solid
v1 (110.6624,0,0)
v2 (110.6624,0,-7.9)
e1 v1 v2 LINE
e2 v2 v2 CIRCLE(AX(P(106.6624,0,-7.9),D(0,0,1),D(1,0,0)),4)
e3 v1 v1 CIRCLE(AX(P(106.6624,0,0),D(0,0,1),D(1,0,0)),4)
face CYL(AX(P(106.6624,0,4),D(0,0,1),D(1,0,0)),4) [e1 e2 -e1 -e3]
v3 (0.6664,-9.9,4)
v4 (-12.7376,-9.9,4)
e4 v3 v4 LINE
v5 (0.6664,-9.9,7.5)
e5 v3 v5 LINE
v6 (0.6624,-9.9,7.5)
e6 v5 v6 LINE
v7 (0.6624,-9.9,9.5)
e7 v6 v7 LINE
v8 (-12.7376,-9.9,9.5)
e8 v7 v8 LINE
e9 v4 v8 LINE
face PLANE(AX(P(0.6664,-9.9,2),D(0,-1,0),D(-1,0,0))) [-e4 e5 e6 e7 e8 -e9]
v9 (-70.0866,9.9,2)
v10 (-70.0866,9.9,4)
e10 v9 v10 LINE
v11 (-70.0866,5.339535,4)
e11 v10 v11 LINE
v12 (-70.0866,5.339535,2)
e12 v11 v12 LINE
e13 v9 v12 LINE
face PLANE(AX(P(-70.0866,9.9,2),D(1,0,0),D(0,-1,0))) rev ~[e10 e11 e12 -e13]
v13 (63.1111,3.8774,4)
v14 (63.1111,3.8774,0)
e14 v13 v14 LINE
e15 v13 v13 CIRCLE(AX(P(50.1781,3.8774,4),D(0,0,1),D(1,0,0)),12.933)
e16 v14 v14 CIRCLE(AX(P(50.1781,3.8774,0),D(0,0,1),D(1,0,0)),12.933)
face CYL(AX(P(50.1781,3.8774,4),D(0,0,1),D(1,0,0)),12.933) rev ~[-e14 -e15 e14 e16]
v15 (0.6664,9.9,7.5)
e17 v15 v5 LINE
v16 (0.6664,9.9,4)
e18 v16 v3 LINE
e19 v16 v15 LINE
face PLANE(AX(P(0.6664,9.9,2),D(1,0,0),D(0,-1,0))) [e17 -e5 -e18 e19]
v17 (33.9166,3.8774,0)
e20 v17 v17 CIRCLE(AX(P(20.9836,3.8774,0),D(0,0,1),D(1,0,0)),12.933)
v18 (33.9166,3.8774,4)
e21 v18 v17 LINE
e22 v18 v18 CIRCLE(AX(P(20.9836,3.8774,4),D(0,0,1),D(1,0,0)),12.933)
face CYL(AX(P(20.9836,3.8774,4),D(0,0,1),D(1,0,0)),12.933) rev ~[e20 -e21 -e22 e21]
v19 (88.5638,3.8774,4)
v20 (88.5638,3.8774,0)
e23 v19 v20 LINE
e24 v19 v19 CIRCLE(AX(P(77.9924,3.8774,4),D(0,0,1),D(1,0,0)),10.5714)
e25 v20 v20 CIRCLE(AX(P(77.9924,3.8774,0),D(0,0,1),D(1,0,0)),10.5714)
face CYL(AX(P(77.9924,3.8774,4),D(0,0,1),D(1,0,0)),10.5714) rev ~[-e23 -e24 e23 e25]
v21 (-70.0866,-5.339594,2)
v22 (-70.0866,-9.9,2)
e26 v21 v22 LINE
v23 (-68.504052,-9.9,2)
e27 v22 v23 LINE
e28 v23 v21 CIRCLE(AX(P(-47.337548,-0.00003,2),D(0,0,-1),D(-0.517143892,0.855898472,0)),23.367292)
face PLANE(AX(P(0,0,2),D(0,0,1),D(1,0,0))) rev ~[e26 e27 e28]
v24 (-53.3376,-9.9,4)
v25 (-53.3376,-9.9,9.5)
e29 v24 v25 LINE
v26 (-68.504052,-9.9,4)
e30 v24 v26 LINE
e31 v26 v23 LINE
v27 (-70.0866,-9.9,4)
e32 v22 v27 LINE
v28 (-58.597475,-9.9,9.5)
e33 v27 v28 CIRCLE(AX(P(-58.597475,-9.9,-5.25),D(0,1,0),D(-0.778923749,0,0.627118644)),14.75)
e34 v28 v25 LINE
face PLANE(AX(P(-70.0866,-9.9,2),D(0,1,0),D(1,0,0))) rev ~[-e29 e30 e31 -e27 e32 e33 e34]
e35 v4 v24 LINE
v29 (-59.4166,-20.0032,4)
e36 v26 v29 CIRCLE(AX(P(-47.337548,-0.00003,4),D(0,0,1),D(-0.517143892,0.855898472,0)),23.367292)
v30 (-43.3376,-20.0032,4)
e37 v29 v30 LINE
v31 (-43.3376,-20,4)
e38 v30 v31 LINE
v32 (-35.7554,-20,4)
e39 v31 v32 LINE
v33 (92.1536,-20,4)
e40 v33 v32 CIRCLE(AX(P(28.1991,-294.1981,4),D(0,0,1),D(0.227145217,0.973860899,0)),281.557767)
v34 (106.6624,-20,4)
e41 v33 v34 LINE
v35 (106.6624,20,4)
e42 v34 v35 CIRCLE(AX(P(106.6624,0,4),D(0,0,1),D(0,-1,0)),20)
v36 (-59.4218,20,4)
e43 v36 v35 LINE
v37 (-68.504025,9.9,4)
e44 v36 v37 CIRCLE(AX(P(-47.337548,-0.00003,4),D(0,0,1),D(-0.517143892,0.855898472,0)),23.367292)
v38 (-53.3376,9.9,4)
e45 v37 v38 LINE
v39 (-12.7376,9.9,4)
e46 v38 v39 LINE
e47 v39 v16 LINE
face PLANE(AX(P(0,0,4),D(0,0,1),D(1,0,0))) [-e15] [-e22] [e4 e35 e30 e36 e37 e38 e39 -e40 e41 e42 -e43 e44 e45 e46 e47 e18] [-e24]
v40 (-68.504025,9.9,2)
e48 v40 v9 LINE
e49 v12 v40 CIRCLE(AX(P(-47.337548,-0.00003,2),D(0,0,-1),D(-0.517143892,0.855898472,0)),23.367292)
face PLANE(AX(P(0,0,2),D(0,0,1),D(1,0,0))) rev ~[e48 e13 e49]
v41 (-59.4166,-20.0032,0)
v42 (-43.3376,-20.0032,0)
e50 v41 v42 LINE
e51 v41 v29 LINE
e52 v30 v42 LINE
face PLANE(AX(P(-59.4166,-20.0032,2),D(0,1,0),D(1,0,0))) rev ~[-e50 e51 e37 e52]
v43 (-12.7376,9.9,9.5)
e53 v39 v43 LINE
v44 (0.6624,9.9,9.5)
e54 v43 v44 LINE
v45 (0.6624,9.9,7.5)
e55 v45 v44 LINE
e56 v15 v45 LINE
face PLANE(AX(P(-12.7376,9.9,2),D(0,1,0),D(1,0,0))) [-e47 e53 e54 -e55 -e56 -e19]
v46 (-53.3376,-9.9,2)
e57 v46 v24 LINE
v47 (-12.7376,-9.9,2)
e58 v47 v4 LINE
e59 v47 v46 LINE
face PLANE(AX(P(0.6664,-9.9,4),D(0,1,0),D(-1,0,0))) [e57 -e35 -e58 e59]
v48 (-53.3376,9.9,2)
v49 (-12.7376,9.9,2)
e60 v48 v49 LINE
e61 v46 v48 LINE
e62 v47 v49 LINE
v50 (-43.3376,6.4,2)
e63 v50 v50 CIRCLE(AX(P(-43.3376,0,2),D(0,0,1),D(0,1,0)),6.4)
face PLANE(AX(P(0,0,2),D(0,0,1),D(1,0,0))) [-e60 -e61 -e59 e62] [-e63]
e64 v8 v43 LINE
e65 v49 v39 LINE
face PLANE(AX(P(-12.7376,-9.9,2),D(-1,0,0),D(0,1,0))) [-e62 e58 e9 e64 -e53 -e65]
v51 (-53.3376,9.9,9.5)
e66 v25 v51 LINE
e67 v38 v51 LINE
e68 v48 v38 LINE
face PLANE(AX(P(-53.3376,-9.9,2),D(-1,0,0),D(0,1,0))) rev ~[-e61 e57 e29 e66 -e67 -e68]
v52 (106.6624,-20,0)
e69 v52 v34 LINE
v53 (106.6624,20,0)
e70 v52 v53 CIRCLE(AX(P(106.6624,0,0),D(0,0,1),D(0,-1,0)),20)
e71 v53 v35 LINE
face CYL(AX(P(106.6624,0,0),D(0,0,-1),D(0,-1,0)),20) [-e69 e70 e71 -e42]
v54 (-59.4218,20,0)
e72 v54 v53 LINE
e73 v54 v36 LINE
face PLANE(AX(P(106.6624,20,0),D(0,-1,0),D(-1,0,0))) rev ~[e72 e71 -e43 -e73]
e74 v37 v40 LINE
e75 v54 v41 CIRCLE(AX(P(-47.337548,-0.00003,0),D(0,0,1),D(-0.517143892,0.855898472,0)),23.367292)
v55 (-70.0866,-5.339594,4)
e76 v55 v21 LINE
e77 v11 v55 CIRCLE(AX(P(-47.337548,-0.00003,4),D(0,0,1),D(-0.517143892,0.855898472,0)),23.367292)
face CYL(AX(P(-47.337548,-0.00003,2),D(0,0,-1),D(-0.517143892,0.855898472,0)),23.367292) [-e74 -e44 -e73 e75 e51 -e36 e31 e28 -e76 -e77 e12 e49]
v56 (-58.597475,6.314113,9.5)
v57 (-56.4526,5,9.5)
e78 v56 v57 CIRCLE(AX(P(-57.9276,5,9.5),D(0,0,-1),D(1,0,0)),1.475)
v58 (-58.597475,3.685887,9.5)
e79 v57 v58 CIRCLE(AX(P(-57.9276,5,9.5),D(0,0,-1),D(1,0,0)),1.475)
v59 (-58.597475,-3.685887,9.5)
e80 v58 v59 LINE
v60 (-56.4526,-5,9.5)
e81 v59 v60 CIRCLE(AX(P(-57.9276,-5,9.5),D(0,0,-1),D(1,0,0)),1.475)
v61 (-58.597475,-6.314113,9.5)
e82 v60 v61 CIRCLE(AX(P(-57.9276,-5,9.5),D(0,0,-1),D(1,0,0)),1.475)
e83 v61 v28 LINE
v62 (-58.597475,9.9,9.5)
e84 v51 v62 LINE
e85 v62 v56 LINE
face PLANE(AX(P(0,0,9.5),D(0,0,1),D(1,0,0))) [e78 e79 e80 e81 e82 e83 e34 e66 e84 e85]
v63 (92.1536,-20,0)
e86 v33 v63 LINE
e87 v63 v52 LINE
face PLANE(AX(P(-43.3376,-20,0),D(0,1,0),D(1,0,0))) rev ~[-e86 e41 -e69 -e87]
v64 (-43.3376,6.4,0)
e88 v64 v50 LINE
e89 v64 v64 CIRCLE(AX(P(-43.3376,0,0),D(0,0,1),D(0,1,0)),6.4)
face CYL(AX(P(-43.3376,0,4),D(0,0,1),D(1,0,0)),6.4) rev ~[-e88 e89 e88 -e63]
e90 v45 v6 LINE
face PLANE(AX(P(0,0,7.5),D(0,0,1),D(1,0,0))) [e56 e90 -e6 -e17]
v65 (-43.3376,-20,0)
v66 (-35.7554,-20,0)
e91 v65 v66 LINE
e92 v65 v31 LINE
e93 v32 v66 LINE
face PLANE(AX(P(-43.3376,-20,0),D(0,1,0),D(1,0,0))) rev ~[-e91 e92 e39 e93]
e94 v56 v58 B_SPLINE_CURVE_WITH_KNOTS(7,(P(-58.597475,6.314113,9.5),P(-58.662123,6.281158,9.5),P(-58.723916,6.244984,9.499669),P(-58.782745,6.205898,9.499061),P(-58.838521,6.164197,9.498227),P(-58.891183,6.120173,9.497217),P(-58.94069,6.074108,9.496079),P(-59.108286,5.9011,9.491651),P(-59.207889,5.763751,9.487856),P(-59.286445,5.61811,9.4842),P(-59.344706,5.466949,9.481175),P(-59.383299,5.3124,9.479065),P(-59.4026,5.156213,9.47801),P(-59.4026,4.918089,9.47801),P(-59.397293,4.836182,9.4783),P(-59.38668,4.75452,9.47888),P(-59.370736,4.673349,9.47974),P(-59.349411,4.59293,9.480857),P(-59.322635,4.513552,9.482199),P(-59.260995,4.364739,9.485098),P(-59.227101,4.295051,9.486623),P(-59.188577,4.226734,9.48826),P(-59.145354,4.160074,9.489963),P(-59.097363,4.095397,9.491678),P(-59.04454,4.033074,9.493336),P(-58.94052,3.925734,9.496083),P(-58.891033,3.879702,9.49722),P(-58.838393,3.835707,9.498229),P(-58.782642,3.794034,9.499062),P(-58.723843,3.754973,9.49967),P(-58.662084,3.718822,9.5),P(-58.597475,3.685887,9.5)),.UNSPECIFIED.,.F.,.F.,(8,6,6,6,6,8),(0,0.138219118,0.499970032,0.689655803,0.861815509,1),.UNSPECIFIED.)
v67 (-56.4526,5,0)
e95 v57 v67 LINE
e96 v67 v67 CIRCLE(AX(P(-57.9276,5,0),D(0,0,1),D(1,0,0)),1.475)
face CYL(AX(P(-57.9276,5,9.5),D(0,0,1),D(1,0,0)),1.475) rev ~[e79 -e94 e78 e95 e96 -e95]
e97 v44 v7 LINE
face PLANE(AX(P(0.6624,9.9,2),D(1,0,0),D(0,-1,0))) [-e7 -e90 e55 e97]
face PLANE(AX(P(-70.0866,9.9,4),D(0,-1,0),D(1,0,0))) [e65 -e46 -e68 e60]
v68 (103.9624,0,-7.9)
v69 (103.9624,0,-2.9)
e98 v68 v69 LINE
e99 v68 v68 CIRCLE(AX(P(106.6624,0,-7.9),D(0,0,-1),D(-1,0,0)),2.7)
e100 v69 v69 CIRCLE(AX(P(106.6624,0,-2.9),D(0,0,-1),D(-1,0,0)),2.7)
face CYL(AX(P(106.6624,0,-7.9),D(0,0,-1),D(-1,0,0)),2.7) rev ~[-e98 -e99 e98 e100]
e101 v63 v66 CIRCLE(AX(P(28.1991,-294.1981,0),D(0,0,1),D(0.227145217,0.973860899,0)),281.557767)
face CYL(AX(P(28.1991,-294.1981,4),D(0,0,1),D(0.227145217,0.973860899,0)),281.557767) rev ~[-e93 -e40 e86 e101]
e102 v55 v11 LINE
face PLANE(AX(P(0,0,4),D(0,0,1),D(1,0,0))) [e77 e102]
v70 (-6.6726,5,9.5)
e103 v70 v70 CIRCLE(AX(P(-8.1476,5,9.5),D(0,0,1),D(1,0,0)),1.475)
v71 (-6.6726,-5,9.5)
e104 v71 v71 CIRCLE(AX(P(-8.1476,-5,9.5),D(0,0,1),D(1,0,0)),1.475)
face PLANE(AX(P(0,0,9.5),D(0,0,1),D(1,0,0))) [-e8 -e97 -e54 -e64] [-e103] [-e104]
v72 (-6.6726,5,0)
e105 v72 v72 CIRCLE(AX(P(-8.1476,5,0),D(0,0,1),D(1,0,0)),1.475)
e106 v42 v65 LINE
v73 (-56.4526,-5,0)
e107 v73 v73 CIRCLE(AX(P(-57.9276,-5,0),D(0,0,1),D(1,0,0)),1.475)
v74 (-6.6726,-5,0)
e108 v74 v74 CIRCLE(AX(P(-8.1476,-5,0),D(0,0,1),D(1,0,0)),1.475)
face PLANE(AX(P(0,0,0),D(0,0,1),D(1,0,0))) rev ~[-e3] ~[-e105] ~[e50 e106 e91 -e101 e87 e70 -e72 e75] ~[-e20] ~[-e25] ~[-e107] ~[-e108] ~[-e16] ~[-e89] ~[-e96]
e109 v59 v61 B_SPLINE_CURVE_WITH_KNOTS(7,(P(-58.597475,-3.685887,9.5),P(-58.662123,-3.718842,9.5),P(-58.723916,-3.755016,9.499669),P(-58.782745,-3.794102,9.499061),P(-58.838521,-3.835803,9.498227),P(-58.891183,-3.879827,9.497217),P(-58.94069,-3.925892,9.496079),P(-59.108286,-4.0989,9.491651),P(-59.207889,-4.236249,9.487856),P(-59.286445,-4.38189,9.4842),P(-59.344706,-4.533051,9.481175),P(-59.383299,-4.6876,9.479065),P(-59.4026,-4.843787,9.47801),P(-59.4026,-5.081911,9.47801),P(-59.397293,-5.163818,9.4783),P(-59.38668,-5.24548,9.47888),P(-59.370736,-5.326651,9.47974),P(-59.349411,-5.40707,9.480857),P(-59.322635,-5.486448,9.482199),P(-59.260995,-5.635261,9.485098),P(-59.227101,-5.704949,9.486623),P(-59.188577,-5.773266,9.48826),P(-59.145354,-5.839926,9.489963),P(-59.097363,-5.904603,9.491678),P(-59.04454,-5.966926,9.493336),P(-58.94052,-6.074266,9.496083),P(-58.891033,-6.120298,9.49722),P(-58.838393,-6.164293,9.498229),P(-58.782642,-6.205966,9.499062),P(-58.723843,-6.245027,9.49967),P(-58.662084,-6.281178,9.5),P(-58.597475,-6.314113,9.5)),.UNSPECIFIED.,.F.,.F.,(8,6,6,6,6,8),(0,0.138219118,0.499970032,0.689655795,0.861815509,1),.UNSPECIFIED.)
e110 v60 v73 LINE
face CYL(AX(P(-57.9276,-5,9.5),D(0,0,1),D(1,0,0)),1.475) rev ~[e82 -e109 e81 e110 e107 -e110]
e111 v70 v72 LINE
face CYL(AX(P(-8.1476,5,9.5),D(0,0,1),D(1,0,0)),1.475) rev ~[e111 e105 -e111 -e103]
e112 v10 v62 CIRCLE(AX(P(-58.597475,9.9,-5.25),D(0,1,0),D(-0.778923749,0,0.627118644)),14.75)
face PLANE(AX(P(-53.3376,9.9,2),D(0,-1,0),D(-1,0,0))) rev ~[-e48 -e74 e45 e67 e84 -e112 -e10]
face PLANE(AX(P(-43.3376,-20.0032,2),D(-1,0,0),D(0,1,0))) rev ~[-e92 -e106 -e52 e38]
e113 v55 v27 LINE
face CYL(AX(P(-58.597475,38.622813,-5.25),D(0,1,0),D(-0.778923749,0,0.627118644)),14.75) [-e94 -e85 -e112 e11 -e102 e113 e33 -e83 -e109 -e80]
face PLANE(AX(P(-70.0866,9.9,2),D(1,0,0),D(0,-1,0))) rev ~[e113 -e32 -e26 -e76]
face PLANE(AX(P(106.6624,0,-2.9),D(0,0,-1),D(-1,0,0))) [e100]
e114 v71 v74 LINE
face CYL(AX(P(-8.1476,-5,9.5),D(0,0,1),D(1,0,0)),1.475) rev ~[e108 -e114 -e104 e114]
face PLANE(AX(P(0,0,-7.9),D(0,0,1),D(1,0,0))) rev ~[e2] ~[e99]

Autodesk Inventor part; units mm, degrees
ref_plane "YZ Plane" through (0, 0, 0) normal (1, 0, 0) x (0, 1, 0)
ref_plane "XZ Plane" through (0, 0, 0) normal (0, 1, 0) x (-1, 0, 0)
ref_plane "XY Plane" through (0, 0, 0) normal (0, 0, 1) x (1, 0, 0)
sketch "Sketch1" plane through (0, 0, 0) normal (0, 0, 1) x (1, 0, 0)
  line L0 (-43.3376, 0) -> (106.6624, 0) construction
  line L1 (-43.3376, -20) -> (106.6624, -20)
  line L2 (106.6624, 20) -> (-43.3376, 20)
  arc A0 (-43.3376, 20) -> (-43.3376, -20) centre (-43.3376, 0) ccw
  arc A1 (106.6624, -20) -> (106.6624, 20) centre (106.6624, 0) ccw
  point P0 (0, 0)
  point P1 (31.6624, 0)
  dimension "d0" = 150
  dimension "d1" = 20
extrude "Extrusion1" add sketch "Sketch1" along normal blind 4
sketch "Sketch2" plane through (0, 0, 4) normal (0, 0, 1) x (1, 0, 0)
  arc A0 (-43.3376, 20) -> (-43.3376, -20) centre (-43.3376, 0) ccw projected
  arc A1 (106.6624, -20) -> (106.6624, 20) centre (106.6624, 0) ccw projected
  circle A2 centre (-43.3376, 0) radius 6.4
  circle A3 centre (106.6624, 0) radius 4
  point P0 (0, 0)
  dimension "d4" = 12.8
  dimension "d5" = 8
extrude "Extrusion2" add sketch "Sketch2" against normal blind 11.9 contours A3
sketch "Sketch5" plane through (0, 0, 4) normal (0, 0, 1) x (1, 0, 0)
  line L0 (-43.3376, -20) -> (106.6624, -20) projected
  arc A0 (92.1536, -20) -> (-35.7554, -20) centre (28.1991, -294.1981) ccw
  point P0 (0, 0)
extrude "Extrusion5" cut sketch "Sketch5" against normal through all
sketch "Sketch6" plane through (0, 0, 0) normal (0, 0, -1) x (-1, 0, 0)
  point P0 (0, 0)
sketch "Sketch7" plane through (106.6624, 0, -7.9) normal (0, 0, -1) x (-1, 0, 0)
  circle A0 centre (0, 0) radius 2.7
  point P0 (106.6624, 0)
  dimension "d18" = 5.4
extrude "Extrusion6" cut sketch "Sketch7" against normal blind 5
sketch "Sketch8" plane through (0, 0, 0) normal (0, 0, -1) x (-1, 0, 0)
  point P0 (0, 0)
extrude "Extrusion7" cut sketch "Sketch2" along normal mid plane 11.9 contours A2
sketch "Sketch9" plane through (106.6624, 0, -7.9) normal (0, 0, -1) x (-1, 0, 0)
  point P0 (106.6624, 0)
sketch "Sketch10" plane through (0, 0, 0) normal (0, 0, -1) x (-1, 0, 0)
  point P0 (0, 0)
sketch "Sketch11" plane through (0, 0, 4) normal (0, 0, 1) x (1, 0, 0)
  line L0 (-70.0866, 9.9) -> (0.6664, 9.9)
  line L1 (0.6664, 9.9) -> (0.6664, -9.9)
  line L2 (0.6664, -9.9) -> (-70.0866, -9.9)
  line L3 (-70.0866, -9.9) -> (-70.0866, 9.9)
  line L4 (-70.0866, 9.9) -> (0.6664, -9.9) construction
  line L5 (0.6664, 9.9) -> (-70.0866, -9.9) construction
  circle A0 centre (-43.3376, 0) radius 6.4 projected
  point P0 (0, 0)
  point P1 (-34.7101, 0)
  dimension "d23" = 70.753
  dimension "d24" = 19.8
  dimension "d25" = 26.749
  dimension "d26" = 9.9
sketch "Sketch12" plane through (0, 0, 4) normal (0, 0, 1) x (1, 0, 0)
  circle A0 centre (-43.3376, 0) radius 6.4 projected
  point P0 (0, 0)
ref_plane "Work Plane1" through (0, 0, 2) normal (0, 0, 1) x (1, 0, 0)
sketch "Sketch13" plane through (0, 0, 2) normal (0, 0, 1) x (1, 0, 0)
  arc A0 (-43.3376, 20) -> (-60.7155, 9.9) centre (-43.3376, 0) ccw projected
  line L0 (-43.3376, 20) -> (-59.4218, 20)
  line L1 (-59.4166, -20.0032) -> (-43.3376, -20.0032)
  line L2 (-43.3376, -20.0032) -> (-43.3376, 20)
  circle A1 centre (-43.3376, 0) radius 4 projected
  arc A2 (-59.4218, 20) -> (-59.4166, -20.0032) centre (-47.3376, 0) ccw
  point P0 (0, 0)
  point P1 (-43.3376, -4)
  point P2 (-43.3376, 4)
extrude "Extrusion9" add sketch "Sketch13" along normal mid plane 4 contours L2 A1 L1 A2 L0
extrude "Extrusion10" cut sketch "Sketch11" against normal blind 2
sketch "Sketch14" plane through (0, 0, 2) normal (0, 0, 1) x (1, 0, 0)
  line L0 (-53.3376, 9.9) -> (-70.0866, 9.9)
  line L1 (-70.0866, 9.9) -> (-70.0866, -9.9)
  line L2 (-70.0866, -9.9) -> (-53.3376, -9.9)
  line L3 (-53.3376, -9.9) -> (-53.3376, 9.9)
  line L4 (-53.3376, 9.9) -> (-70.0866, -9.9) construction
  line L5 (-70.0866, 9.9) -> (-53.3376, -9.9) construction
  arc A0 (-43.3376, -6.4) -> (-43.3376, 6.4) centre (-43.3376, 0) ccw projected
  line L6 (-12.7376, 9.9) -> (0.6624, 9.9)
  line L7 (0.6624, 9.9) -> (0.6624, -9.9)
  line L8 (0.6624, -9.9) -> (-12.7376, -9.9)
  line L9 (-12.7376, -9.9) -> (-12.7376, 9.9)
  line L10 (-12.7376, 9.9) -> (0.6624, -9.9) construction
  line L11 (0.6624, 9.9) -> (-12.7376, -9.9) construction
  point P0 (0, 0)
  point P1 (-61.7121, 0)
  point P2 (-61.7121, -9.9)
  point P3 (-6.0376, 0)
  dimension "d33" = 19.8
  dimension "d34" = 16.749
  dimension "d35" = 10
  dimension "d36" = 13.4
  dimension "d37" = 19.8
  dimension "d38" = 30.6
extrude "Extrusion11" add sketch "Sketch14" along normal blind 7.5
fillet "Fillet3" radius 14.75 1 edges at (-70.0866, 0, 9.5)
sketch "Sketch15" plane through (0, 0, 2) normal (0, 0, 1) x (1, 0, 0)
  line L0 (0.6664, -9.9) -> (0.6624, -9.9) projected
  line L1 (0.6664, 9.9) -> (0.6664, -9.9) projected
  line L2 (0.6624, -9.9) -> (0.6664, -9.9)
  line L3 (0.6664, -9.9) -> (0.6664, 9.9)
  line L4 (0.6664, 9.9) -> (0.6624, 9.9)
  line L5 (0.6624, 9.9) -> (0.6624, -9.9)
  point P0 (0, 0)
extrude "Extrusion12" add sketch "Sketch15" along normal blind 5.5
sketch "Sketch16" plane through (0, 0, 9.5) normal (0, 0, 1) x (1, 0, 0)
  circle A0 centre (-57.9276, -5) radius 1.475
  circle A1 centre (-57.9276, 5) radius 1.475
  line L0 (-58.5975, -9.9) -> (-58.5975, 9.9) projected
  line L1 (-58.5975, -9.9) -> (-53.3376, -9.9) projected
  line L2 (-53.3376, 9.9) -> (-58.5975, 9.9) projected
  circle A2 centre (-8.1476, -5) radius 1.475
  circle A3 centre (-8.1476, 5) radius 1.475
  line L3 (-12.7376, 9.9) -> (-12.7376, -9.9) projected
  line L4 (-12.7376, -9.9) -> (0.6664, -9.9) projected
  line L5 (0.6664, 9.9) -> (-12.7376, 9.9) projected
  arc A4 (-43.3376, -6.4) -> (-43.3376, 6.4) centre (-43.3376, 0) ccw projected
  point P0 (0, 0)
  dimension "d44" = 2.95
  dimension "d45" = 2.95
  dimension "d47" = 4.9
  dimension "d49" = 4.9
  dimension "d50" = 2.95
  dimension "d51" = 2.95
  dimension "d52" = 4.59
  dimension "d53" = 4.59
  dimension "d54" = 4.9
  dimension "d55" = 4.9
  dimension "d60" = 14.59
  dimension "d61" = 14.59
extrude "Extrusion13" cut sketch "Sketch16" against normal blind 10
sketch "Sketch17" plane through (0, 0, 2) normal (0, 0, 1) x (1, 0, 0)
  point P0 (0, 0)
sketch "Sketch18" plane through (0, 0, 2) normal (0, 0, 1) x (1, 0, 0)
  point P0 (0, 0)
extrude "Extrusion14" cut sketch "Sketch12" against normal blind 11.9
sketch "Sketch19" plane through (0, 0, 4) normal (0, 0, 1) x (1, 0, 0)
  circle A0 centre (20.9836, 3.8774) radius 12.933
  circle A1 centre (50.1781, 3.8774) radius 12.933
  circle A2 centre (77.9924, 3.8774) radius 10.5714
  point P0 (0, 0)
extrude "Extrusion15" cut sketch "Sketch19" against normal blind 10
sketch "Sketch20" plane through (0, 0, 2) normal (0, 0, 1) x (1, 0, 0)
  point P0 (0, 0)
properties part number "elbow" material "Aluminum 6061"
